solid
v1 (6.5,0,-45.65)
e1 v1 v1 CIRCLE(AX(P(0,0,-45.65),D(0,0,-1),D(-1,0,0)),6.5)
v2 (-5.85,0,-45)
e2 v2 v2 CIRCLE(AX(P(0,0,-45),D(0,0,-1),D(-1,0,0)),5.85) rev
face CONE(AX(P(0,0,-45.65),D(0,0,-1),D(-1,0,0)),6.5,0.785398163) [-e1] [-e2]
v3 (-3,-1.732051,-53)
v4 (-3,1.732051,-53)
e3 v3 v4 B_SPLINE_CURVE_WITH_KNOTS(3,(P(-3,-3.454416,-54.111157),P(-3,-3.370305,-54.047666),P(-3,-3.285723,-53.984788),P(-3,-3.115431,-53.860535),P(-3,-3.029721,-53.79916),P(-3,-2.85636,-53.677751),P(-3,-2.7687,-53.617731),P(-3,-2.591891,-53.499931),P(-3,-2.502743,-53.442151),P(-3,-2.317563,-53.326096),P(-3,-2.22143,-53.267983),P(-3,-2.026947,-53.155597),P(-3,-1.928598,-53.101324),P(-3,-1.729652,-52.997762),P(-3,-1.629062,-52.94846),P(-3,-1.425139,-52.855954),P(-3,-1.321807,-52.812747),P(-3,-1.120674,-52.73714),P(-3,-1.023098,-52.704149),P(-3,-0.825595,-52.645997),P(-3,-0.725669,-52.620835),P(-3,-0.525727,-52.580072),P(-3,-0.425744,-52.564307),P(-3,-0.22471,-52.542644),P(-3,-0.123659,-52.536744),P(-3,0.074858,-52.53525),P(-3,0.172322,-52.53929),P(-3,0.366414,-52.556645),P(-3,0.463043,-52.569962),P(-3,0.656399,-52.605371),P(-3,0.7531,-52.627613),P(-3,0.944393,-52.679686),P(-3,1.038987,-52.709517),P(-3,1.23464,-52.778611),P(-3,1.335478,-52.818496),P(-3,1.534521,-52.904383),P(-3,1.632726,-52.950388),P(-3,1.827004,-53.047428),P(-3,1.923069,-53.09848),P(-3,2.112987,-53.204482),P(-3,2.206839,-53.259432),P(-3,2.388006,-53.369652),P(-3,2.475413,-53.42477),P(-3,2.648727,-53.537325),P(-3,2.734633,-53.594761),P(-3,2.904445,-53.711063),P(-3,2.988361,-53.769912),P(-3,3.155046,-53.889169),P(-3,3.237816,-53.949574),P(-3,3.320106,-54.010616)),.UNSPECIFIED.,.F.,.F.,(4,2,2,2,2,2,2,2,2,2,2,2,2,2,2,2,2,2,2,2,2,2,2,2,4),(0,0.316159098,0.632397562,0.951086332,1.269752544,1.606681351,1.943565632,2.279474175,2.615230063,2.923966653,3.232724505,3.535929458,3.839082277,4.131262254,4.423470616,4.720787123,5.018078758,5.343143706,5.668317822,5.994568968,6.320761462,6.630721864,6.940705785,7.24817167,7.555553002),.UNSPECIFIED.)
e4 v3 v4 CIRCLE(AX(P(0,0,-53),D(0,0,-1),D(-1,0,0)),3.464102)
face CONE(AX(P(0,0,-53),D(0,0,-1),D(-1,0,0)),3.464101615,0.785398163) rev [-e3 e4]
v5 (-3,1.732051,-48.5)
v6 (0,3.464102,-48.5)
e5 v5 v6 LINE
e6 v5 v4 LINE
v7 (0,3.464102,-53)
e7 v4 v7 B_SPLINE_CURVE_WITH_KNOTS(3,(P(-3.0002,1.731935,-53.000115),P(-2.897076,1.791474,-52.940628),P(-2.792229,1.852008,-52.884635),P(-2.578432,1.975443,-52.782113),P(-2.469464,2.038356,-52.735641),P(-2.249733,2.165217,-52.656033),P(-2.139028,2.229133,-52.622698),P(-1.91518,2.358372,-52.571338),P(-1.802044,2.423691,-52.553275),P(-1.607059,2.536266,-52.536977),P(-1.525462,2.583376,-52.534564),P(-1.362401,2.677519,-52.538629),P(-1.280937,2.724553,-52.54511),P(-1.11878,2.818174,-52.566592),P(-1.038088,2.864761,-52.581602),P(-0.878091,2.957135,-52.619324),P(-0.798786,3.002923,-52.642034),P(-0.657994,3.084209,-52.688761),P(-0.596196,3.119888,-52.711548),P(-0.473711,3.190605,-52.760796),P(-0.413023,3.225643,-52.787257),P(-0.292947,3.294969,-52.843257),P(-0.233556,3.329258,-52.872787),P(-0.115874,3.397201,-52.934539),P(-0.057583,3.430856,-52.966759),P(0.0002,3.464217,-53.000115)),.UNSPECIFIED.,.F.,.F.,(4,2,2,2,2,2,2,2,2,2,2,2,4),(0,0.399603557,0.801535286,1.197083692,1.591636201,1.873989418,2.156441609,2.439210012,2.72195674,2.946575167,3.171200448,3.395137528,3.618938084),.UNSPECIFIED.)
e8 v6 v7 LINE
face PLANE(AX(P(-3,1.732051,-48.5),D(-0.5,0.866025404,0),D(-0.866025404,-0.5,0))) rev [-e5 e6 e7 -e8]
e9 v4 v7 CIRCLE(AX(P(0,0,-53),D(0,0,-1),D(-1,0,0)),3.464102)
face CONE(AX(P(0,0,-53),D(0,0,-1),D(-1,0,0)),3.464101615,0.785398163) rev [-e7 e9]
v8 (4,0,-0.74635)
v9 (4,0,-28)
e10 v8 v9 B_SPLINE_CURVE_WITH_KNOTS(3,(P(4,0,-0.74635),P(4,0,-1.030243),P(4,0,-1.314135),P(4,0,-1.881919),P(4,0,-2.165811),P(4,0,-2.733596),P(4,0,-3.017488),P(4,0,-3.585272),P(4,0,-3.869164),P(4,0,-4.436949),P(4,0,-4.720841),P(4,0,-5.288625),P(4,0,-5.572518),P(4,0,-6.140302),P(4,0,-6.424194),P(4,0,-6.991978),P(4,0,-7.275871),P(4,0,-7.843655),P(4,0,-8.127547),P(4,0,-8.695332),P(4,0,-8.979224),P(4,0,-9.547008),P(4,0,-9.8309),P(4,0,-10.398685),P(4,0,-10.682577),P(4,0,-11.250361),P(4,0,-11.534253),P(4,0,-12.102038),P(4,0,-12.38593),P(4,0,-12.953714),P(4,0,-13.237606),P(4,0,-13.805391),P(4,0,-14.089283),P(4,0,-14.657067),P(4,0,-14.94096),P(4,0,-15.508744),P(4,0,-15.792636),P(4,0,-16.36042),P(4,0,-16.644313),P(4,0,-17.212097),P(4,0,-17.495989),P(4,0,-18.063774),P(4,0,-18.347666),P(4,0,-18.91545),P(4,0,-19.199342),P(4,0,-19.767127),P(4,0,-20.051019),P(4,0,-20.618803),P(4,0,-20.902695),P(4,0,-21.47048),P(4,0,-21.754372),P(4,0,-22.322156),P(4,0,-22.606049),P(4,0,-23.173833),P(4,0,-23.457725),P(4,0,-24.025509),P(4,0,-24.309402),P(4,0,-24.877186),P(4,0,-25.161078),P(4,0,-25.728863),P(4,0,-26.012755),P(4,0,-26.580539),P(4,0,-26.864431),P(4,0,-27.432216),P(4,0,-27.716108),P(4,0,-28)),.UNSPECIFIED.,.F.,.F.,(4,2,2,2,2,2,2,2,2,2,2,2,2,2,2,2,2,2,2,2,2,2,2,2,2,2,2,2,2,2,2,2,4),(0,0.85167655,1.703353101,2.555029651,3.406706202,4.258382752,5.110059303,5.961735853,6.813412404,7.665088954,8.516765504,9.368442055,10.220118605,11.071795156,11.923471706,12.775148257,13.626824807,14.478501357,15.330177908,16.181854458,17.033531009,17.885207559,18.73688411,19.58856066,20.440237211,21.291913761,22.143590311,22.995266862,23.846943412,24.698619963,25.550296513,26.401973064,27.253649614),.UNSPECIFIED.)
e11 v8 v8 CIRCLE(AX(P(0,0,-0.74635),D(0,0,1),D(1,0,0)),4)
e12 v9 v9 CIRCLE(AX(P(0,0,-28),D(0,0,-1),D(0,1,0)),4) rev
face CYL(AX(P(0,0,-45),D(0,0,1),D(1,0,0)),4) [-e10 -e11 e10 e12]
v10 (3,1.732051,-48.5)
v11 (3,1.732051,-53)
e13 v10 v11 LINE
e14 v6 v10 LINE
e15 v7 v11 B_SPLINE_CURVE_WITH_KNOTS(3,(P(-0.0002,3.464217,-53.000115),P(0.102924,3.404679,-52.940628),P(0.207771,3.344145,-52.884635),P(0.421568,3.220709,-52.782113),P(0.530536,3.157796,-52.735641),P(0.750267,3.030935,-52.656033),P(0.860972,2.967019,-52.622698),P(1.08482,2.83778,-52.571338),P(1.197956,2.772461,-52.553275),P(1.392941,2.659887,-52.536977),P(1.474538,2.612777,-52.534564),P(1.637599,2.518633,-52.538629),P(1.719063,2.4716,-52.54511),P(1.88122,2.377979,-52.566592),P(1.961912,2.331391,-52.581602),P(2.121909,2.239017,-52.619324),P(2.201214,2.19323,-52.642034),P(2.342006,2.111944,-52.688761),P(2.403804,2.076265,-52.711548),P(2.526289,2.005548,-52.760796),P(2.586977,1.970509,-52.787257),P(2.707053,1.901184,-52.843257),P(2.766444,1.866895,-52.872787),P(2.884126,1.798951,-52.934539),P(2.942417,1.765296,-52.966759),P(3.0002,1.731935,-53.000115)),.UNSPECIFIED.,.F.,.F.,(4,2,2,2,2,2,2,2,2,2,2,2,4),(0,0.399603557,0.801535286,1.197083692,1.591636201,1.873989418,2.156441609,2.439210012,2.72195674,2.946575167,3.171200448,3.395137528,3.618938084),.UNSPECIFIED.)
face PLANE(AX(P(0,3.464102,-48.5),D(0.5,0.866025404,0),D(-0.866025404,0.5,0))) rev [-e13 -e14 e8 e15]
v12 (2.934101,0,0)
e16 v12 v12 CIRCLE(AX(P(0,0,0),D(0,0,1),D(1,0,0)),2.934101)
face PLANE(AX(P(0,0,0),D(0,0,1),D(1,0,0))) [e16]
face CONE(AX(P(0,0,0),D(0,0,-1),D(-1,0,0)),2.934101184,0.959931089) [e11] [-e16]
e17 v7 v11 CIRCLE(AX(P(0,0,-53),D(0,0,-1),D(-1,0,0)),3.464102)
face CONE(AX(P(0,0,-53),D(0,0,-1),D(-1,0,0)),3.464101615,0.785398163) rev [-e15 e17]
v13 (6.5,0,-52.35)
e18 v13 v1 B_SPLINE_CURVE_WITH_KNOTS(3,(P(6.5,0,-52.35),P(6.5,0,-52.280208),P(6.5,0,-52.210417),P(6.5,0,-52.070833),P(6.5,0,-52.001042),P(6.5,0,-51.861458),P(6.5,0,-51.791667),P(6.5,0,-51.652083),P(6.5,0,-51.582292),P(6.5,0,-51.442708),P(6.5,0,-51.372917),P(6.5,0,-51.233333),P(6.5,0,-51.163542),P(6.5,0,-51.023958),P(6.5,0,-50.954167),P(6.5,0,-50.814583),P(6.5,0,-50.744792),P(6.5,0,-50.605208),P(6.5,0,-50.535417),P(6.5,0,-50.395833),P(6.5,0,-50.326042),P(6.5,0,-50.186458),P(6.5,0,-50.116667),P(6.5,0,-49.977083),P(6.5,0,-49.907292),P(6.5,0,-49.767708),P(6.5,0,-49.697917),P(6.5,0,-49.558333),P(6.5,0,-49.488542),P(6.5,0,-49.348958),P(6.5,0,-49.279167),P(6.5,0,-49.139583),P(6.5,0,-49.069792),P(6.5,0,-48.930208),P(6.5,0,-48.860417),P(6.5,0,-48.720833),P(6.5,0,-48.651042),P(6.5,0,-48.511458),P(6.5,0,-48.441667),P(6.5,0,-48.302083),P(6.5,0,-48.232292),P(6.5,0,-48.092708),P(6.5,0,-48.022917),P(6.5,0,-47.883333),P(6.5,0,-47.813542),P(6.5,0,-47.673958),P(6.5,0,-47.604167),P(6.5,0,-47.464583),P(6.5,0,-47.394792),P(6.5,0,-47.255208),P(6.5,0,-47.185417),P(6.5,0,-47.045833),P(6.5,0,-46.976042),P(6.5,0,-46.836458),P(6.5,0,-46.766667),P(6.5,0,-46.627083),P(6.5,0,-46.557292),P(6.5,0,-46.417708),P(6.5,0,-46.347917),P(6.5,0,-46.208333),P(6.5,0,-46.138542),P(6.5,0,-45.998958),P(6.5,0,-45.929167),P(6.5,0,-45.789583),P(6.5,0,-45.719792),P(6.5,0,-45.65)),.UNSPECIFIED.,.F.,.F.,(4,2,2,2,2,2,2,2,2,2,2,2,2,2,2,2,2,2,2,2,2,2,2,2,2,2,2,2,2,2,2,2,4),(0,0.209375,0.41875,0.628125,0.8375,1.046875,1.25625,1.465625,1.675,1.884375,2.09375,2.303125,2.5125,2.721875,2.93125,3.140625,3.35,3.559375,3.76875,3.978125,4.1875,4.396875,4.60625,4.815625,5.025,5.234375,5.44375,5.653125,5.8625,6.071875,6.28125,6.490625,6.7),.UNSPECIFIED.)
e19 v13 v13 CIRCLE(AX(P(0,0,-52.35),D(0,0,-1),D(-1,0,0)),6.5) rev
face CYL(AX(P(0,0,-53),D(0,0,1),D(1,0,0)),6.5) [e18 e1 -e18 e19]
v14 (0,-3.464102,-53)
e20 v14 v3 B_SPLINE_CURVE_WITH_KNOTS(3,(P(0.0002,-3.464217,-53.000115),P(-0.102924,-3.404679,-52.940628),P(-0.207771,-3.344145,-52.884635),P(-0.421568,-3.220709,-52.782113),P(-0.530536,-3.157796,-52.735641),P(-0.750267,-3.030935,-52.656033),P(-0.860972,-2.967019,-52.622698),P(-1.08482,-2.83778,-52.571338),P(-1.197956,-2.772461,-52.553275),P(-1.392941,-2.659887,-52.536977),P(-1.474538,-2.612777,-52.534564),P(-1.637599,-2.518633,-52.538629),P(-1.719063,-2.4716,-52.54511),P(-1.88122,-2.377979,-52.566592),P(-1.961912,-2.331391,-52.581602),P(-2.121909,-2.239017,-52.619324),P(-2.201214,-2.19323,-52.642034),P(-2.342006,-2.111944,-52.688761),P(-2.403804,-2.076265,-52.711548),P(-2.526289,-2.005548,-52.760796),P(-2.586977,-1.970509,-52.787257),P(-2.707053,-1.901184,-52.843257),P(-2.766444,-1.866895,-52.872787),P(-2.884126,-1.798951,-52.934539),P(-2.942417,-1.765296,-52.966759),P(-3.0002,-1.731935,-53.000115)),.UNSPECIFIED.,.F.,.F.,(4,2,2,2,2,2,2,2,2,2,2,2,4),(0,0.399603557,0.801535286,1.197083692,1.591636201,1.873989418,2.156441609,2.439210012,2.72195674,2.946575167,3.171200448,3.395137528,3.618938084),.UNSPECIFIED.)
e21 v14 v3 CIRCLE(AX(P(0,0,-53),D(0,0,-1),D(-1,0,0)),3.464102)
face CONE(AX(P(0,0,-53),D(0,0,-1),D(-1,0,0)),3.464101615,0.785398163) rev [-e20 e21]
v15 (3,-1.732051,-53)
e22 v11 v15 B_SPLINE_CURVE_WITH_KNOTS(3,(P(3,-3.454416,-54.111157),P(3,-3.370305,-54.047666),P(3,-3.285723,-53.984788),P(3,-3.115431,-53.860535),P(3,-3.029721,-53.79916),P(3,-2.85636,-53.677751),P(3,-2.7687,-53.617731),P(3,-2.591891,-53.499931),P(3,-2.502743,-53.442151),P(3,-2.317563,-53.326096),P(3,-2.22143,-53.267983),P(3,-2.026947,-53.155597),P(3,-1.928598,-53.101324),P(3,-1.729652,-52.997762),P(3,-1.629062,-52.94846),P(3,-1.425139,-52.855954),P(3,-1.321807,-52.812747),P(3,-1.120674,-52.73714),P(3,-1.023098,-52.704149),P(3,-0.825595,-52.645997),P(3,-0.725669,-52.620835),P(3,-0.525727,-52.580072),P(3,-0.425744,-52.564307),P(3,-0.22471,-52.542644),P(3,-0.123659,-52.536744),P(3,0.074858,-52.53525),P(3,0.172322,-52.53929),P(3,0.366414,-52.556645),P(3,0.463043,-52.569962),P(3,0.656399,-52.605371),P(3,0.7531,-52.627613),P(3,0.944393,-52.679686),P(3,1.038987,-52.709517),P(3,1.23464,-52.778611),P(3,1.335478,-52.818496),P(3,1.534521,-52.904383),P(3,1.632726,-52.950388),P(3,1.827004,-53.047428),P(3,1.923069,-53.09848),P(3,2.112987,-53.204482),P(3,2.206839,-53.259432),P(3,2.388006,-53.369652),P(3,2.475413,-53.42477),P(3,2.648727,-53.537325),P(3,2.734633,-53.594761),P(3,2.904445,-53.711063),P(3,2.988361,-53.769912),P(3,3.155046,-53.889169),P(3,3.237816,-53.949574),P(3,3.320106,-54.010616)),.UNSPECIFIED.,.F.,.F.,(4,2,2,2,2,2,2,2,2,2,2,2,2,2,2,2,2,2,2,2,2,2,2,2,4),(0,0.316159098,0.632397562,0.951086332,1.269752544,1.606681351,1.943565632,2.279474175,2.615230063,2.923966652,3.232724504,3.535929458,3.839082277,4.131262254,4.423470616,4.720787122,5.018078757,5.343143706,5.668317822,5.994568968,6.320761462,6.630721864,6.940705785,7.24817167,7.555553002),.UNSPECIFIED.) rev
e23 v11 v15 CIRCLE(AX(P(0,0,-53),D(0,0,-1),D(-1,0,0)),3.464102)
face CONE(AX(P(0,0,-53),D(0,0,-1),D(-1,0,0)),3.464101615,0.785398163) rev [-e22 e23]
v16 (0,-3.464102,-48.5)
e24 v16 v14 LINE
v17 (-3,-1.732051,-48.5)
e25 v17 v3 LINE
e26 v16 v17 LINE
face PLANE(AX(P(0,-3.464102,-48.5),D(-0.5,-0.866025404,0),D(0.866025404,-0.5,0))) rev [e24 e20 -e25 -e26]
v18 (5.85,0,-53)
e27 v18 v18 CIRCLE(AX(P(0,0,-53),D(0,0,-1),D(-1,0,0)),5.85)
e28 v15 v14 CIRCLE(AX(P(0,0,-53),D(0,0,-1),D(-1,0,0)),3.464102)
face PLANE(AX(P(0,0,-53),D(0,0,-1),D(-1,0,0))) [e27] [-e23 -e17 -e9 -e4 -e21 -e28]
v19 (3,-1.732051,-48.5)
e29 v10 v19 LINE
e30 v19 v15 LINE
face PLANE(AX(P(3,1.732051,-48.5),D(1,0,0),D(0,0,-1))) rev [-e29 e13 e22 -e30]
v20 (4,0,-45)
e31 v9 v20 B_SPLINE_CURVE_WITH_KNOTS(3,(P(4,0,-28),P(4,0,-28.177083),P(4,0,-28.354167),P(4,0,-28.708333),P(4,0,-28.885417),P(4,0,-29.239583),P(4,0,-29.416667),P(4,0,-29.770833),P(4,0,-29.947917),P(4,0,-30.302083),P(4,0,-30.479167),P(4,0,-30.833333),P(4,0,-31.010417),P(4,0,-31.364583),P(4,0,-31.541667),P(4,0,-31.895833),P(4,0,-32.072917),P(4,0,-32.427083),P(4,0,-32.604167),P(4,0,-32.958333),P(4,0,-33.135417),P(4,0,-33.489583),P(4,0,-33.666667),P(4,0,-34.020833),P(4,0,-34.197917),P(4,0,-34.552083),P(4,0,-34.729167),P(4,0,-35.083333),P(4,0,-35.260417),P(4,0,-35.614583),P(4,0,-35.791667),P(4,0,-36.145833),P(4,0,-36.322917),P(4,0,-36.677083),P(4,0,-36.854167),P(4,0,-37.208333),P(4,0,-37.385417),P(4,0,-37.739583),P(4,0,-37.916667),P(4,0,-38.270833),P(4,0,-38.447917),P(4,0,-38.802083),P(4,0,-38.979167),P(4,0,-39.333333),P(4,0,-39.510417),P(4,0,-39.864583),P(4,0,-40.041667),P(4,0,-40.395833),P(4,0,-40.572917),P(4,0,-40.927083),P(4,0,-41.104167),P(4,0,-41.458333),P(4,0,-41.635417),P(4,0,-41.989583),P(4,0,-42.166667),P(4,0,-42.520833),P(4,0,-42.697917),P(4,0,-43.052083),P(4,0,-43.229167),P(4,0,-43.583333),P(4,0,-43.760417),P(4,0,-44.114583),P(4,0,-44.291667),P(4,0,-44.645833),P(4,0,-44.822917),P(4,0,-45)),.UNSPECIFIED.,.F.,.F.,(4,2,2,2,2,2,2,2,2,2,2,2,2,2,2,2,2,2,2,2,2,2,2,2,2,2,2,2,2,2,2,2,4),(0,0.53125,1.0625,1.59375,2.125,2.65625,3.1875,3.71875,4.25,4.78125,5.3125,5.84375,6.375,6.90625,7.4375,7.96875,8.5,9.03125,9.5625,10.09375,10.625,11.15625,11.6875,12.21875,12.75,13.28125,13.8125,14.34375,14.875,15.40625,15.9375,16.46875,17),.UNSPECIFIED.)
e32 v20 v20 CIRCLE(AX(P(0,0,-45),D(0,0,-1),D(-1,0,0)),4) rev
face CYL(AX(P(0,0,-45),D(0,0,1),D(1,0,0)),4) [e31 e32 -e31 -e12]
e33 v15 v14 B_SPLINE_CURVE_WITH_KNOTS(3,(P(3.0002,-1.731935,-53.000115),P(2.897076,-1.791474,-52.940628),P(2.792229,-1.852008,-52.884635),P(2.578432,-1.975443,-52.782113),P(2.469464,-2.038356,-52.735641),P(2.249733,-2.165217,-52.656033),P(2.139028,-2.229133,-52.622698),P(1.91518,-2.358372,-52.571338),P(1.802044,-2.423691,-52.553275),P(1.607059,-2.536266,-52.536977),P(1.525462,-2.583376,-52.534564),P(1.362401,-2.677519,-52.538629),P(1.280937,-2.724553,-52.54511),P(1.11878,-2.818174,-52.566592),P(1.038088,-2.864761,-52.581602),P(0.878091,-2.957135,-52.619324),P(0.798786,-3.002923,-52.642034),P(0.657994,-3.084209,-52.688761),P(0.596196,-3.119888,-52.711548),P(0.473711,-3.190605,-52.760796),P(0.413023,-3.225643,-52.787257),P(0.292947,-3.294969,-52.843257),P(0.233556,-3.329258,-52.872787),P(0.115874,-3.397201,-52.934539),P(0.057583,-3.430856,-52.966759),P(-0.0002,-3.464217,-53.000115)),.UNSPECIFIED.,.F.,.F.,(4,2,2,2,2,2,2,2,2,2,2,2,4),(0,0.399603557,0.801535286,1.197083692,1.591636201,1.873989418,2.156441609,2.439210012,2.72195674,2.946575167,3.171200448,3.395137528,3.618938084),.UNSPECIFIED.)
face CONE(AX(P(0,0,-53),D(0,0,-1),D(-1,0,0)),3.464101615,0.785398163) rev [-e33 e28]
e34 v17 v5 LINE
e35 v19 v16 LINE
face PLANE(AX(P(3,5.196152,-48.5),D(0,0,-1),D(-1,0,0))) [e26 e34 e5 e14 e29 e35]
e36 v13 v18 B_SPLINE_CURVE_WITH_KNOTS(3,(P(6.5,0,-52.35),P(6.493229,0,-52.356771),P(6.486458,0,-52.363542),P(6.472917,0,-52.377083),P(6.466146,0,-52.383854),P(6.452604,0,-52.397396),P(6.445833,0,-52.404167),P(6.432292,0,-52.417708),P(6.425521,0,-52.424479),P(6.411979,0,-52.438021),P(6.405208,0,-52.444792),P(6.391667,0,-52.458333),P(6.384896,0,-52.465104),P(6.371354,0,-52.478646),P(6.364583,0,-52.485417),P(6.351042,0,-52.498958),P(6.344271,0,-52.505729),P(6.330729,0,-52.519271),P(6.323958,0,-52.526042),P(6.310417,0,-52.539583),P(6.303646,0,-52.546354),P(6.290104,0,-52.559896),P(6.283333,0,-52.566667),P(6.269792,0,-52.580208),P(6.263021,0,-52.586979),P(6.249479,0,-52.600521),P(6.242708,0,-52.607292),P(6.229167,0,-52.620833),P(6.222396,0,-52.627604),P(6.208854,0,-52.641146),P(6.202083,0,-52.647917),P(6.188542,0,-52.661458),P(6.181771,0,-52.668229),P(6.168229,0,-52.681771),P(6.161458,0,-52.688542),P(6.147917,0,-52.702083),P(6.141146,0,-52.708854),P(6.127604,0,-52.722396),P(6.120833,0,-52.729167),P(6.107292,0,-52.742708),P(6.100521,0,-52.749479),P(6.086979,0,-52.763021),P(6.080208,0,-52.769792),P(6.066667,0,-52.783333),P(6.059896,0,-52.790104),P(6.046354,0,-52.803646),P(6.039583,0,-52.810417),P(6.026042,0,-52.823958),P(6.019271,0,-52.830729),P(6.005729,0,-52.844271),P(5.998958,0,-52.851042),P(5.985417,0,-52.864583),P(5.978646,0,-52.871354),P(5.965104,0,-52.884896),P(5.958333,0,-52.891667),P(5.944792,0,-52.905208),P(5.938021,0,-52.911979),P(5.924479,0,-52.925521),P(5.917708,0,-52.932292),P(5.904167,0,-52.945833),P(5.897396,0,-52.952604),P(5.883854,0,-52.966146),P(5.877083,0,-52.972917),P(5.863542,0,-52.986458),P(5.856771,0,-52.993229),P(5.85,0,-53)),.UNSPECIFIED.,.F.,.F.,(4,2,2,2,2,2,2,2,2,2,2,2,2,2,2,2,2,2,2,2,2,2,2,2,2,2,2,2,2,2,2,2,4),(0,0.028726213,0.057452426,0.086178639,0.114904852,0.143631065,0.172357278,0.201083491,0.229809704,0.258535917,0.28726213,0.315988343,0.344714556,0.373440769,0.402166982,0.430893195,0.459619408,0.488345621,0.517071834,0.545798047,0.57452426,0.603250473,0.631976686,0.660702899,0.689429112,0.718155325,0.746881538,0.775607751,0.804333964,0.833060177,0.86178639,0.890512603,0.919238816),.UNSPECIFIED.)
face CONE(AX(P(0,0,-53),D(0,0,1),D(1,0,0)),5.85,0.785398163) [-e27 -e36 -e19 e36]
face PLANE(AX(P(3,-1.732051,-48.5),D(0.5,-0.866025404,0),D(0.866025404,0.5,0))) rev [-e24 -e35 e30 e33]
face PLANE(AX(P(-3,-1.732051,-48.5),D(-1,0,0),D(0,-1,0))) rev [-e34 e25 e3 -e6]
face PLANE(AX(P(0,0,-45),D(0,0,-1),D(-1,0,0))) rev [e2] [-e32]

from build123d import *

# Parameters (mm, degrees)
SKETCH1_R            = 4
EXTRUDE1_DEPTH       = 45
SKETCH6_R            = 6.5
EXTRUDE2_DEPTH       = 8
CUT_EXTRUDE1_DEPTH   = 4.5
CHAMFER1_SIZE        = 0.65
SKETCH10_R           = 4
PARTIAL_THREAD_DEPTH = 17
CHAMFER2_SIZE        = 0.16


with BuildPart() as part:
    # Sketch1 → Extrude1 (new body)
    with BuildSketch(Plane.XY):
        Circle(SKETCH1_R)
    extrude(amount=-EXTRUDE1_DEPTH)

    # Sketch4 → Cut-Revolve1 (revolve, cut)
    with BuildSketch(Plane(origin=(0, 0, 0), x_dir=(0, 0, -1), z_dir=(1, 0, 0)), mode=Mode.PRIVATE) as cut_revolve1_sk:
        Polygon((0.746350386, 4), (0, 2.934101184), (0, 4), align=None)
    revolve(cut_revolve1_sk.sketch.rotate(Axis((0, 0, 0), (0, 0, -1)), 90), axis=Axis((0, 0, 0), (0, 0, -1)), mode=Mode.SUBTRACT)

    # Sketch6 → Extrude2 (add)
    with BuildSketch(Plane(origin=(0, 0, -45), x_dir=(-1, 0, 0), z_dir=(0, 0, -1))):
        Circle(SKETCH6_R)
    extrude(amount=EXTRUDE2_DEPTH)

    # Sketch7 → Cut-Extrude1 (cut)
    with BuildSketch(Plane(origin=(0, 0, -53), x_dir=(-1, 0, 0), z_dir=(0, 0, -1))):
        Polygon((0, 3.464101615), (-3, 1.732050808), (-3, -1.732050808), (0, -3.464101615), (3, -1.732050808), (3, 1.732050808), align=None)
    extrude(amount=-CUT_EXTRUDE1_DEPTH, mode=Mode.SUBTRACT)

    # Cut-Extrude2 cone 1 section (through the dimple's axis) → Cut-Extrude2 (revolve, cut)
    with BuildSketch(Plane(origin=(0, 0, -53), x_dir=(0, 1, 0), z_dir=(1, 0, 0))):
        Polygon((0, 0), (3.464101615, 0), (0, 3.464101615), align=None)
    revolve(axis=Axis((0, 0, -53), (0, 0, 1)), mode=Mode.SUBTRACT)

    # Chamfer1
    chamfer1_edges = [part.edges().sort_by_distance(p)[0] for p in [
        (6.5, 0, -45),
        (6.5, 0, -53),
    ]]
    chamfer(chamfer1_edges, length=CHAMFER1_SIZE)


with BuildPart() as body_2:
    # Sketch10 → partial thread (new body)
    with BuildSketch(Plane.XY.offset(-45)):
        Circle(SKETCH10_R)
    extrude(amount=PARTIAL_THREAD_DEPTH)

    # Chamfer2
    chamfer2_edges = [body_2.edges().sort_by_distance(p)[0] for p in [
        (-4, 0, -28),
    ]]
    chamfer(chamfer2_edges, length=CHAMFER2_SIZE)


with BuildPart() as part_1:
    add(part.part)

    # Combine1: union body 2
    add(body_2.part)


solid = part_1.part
